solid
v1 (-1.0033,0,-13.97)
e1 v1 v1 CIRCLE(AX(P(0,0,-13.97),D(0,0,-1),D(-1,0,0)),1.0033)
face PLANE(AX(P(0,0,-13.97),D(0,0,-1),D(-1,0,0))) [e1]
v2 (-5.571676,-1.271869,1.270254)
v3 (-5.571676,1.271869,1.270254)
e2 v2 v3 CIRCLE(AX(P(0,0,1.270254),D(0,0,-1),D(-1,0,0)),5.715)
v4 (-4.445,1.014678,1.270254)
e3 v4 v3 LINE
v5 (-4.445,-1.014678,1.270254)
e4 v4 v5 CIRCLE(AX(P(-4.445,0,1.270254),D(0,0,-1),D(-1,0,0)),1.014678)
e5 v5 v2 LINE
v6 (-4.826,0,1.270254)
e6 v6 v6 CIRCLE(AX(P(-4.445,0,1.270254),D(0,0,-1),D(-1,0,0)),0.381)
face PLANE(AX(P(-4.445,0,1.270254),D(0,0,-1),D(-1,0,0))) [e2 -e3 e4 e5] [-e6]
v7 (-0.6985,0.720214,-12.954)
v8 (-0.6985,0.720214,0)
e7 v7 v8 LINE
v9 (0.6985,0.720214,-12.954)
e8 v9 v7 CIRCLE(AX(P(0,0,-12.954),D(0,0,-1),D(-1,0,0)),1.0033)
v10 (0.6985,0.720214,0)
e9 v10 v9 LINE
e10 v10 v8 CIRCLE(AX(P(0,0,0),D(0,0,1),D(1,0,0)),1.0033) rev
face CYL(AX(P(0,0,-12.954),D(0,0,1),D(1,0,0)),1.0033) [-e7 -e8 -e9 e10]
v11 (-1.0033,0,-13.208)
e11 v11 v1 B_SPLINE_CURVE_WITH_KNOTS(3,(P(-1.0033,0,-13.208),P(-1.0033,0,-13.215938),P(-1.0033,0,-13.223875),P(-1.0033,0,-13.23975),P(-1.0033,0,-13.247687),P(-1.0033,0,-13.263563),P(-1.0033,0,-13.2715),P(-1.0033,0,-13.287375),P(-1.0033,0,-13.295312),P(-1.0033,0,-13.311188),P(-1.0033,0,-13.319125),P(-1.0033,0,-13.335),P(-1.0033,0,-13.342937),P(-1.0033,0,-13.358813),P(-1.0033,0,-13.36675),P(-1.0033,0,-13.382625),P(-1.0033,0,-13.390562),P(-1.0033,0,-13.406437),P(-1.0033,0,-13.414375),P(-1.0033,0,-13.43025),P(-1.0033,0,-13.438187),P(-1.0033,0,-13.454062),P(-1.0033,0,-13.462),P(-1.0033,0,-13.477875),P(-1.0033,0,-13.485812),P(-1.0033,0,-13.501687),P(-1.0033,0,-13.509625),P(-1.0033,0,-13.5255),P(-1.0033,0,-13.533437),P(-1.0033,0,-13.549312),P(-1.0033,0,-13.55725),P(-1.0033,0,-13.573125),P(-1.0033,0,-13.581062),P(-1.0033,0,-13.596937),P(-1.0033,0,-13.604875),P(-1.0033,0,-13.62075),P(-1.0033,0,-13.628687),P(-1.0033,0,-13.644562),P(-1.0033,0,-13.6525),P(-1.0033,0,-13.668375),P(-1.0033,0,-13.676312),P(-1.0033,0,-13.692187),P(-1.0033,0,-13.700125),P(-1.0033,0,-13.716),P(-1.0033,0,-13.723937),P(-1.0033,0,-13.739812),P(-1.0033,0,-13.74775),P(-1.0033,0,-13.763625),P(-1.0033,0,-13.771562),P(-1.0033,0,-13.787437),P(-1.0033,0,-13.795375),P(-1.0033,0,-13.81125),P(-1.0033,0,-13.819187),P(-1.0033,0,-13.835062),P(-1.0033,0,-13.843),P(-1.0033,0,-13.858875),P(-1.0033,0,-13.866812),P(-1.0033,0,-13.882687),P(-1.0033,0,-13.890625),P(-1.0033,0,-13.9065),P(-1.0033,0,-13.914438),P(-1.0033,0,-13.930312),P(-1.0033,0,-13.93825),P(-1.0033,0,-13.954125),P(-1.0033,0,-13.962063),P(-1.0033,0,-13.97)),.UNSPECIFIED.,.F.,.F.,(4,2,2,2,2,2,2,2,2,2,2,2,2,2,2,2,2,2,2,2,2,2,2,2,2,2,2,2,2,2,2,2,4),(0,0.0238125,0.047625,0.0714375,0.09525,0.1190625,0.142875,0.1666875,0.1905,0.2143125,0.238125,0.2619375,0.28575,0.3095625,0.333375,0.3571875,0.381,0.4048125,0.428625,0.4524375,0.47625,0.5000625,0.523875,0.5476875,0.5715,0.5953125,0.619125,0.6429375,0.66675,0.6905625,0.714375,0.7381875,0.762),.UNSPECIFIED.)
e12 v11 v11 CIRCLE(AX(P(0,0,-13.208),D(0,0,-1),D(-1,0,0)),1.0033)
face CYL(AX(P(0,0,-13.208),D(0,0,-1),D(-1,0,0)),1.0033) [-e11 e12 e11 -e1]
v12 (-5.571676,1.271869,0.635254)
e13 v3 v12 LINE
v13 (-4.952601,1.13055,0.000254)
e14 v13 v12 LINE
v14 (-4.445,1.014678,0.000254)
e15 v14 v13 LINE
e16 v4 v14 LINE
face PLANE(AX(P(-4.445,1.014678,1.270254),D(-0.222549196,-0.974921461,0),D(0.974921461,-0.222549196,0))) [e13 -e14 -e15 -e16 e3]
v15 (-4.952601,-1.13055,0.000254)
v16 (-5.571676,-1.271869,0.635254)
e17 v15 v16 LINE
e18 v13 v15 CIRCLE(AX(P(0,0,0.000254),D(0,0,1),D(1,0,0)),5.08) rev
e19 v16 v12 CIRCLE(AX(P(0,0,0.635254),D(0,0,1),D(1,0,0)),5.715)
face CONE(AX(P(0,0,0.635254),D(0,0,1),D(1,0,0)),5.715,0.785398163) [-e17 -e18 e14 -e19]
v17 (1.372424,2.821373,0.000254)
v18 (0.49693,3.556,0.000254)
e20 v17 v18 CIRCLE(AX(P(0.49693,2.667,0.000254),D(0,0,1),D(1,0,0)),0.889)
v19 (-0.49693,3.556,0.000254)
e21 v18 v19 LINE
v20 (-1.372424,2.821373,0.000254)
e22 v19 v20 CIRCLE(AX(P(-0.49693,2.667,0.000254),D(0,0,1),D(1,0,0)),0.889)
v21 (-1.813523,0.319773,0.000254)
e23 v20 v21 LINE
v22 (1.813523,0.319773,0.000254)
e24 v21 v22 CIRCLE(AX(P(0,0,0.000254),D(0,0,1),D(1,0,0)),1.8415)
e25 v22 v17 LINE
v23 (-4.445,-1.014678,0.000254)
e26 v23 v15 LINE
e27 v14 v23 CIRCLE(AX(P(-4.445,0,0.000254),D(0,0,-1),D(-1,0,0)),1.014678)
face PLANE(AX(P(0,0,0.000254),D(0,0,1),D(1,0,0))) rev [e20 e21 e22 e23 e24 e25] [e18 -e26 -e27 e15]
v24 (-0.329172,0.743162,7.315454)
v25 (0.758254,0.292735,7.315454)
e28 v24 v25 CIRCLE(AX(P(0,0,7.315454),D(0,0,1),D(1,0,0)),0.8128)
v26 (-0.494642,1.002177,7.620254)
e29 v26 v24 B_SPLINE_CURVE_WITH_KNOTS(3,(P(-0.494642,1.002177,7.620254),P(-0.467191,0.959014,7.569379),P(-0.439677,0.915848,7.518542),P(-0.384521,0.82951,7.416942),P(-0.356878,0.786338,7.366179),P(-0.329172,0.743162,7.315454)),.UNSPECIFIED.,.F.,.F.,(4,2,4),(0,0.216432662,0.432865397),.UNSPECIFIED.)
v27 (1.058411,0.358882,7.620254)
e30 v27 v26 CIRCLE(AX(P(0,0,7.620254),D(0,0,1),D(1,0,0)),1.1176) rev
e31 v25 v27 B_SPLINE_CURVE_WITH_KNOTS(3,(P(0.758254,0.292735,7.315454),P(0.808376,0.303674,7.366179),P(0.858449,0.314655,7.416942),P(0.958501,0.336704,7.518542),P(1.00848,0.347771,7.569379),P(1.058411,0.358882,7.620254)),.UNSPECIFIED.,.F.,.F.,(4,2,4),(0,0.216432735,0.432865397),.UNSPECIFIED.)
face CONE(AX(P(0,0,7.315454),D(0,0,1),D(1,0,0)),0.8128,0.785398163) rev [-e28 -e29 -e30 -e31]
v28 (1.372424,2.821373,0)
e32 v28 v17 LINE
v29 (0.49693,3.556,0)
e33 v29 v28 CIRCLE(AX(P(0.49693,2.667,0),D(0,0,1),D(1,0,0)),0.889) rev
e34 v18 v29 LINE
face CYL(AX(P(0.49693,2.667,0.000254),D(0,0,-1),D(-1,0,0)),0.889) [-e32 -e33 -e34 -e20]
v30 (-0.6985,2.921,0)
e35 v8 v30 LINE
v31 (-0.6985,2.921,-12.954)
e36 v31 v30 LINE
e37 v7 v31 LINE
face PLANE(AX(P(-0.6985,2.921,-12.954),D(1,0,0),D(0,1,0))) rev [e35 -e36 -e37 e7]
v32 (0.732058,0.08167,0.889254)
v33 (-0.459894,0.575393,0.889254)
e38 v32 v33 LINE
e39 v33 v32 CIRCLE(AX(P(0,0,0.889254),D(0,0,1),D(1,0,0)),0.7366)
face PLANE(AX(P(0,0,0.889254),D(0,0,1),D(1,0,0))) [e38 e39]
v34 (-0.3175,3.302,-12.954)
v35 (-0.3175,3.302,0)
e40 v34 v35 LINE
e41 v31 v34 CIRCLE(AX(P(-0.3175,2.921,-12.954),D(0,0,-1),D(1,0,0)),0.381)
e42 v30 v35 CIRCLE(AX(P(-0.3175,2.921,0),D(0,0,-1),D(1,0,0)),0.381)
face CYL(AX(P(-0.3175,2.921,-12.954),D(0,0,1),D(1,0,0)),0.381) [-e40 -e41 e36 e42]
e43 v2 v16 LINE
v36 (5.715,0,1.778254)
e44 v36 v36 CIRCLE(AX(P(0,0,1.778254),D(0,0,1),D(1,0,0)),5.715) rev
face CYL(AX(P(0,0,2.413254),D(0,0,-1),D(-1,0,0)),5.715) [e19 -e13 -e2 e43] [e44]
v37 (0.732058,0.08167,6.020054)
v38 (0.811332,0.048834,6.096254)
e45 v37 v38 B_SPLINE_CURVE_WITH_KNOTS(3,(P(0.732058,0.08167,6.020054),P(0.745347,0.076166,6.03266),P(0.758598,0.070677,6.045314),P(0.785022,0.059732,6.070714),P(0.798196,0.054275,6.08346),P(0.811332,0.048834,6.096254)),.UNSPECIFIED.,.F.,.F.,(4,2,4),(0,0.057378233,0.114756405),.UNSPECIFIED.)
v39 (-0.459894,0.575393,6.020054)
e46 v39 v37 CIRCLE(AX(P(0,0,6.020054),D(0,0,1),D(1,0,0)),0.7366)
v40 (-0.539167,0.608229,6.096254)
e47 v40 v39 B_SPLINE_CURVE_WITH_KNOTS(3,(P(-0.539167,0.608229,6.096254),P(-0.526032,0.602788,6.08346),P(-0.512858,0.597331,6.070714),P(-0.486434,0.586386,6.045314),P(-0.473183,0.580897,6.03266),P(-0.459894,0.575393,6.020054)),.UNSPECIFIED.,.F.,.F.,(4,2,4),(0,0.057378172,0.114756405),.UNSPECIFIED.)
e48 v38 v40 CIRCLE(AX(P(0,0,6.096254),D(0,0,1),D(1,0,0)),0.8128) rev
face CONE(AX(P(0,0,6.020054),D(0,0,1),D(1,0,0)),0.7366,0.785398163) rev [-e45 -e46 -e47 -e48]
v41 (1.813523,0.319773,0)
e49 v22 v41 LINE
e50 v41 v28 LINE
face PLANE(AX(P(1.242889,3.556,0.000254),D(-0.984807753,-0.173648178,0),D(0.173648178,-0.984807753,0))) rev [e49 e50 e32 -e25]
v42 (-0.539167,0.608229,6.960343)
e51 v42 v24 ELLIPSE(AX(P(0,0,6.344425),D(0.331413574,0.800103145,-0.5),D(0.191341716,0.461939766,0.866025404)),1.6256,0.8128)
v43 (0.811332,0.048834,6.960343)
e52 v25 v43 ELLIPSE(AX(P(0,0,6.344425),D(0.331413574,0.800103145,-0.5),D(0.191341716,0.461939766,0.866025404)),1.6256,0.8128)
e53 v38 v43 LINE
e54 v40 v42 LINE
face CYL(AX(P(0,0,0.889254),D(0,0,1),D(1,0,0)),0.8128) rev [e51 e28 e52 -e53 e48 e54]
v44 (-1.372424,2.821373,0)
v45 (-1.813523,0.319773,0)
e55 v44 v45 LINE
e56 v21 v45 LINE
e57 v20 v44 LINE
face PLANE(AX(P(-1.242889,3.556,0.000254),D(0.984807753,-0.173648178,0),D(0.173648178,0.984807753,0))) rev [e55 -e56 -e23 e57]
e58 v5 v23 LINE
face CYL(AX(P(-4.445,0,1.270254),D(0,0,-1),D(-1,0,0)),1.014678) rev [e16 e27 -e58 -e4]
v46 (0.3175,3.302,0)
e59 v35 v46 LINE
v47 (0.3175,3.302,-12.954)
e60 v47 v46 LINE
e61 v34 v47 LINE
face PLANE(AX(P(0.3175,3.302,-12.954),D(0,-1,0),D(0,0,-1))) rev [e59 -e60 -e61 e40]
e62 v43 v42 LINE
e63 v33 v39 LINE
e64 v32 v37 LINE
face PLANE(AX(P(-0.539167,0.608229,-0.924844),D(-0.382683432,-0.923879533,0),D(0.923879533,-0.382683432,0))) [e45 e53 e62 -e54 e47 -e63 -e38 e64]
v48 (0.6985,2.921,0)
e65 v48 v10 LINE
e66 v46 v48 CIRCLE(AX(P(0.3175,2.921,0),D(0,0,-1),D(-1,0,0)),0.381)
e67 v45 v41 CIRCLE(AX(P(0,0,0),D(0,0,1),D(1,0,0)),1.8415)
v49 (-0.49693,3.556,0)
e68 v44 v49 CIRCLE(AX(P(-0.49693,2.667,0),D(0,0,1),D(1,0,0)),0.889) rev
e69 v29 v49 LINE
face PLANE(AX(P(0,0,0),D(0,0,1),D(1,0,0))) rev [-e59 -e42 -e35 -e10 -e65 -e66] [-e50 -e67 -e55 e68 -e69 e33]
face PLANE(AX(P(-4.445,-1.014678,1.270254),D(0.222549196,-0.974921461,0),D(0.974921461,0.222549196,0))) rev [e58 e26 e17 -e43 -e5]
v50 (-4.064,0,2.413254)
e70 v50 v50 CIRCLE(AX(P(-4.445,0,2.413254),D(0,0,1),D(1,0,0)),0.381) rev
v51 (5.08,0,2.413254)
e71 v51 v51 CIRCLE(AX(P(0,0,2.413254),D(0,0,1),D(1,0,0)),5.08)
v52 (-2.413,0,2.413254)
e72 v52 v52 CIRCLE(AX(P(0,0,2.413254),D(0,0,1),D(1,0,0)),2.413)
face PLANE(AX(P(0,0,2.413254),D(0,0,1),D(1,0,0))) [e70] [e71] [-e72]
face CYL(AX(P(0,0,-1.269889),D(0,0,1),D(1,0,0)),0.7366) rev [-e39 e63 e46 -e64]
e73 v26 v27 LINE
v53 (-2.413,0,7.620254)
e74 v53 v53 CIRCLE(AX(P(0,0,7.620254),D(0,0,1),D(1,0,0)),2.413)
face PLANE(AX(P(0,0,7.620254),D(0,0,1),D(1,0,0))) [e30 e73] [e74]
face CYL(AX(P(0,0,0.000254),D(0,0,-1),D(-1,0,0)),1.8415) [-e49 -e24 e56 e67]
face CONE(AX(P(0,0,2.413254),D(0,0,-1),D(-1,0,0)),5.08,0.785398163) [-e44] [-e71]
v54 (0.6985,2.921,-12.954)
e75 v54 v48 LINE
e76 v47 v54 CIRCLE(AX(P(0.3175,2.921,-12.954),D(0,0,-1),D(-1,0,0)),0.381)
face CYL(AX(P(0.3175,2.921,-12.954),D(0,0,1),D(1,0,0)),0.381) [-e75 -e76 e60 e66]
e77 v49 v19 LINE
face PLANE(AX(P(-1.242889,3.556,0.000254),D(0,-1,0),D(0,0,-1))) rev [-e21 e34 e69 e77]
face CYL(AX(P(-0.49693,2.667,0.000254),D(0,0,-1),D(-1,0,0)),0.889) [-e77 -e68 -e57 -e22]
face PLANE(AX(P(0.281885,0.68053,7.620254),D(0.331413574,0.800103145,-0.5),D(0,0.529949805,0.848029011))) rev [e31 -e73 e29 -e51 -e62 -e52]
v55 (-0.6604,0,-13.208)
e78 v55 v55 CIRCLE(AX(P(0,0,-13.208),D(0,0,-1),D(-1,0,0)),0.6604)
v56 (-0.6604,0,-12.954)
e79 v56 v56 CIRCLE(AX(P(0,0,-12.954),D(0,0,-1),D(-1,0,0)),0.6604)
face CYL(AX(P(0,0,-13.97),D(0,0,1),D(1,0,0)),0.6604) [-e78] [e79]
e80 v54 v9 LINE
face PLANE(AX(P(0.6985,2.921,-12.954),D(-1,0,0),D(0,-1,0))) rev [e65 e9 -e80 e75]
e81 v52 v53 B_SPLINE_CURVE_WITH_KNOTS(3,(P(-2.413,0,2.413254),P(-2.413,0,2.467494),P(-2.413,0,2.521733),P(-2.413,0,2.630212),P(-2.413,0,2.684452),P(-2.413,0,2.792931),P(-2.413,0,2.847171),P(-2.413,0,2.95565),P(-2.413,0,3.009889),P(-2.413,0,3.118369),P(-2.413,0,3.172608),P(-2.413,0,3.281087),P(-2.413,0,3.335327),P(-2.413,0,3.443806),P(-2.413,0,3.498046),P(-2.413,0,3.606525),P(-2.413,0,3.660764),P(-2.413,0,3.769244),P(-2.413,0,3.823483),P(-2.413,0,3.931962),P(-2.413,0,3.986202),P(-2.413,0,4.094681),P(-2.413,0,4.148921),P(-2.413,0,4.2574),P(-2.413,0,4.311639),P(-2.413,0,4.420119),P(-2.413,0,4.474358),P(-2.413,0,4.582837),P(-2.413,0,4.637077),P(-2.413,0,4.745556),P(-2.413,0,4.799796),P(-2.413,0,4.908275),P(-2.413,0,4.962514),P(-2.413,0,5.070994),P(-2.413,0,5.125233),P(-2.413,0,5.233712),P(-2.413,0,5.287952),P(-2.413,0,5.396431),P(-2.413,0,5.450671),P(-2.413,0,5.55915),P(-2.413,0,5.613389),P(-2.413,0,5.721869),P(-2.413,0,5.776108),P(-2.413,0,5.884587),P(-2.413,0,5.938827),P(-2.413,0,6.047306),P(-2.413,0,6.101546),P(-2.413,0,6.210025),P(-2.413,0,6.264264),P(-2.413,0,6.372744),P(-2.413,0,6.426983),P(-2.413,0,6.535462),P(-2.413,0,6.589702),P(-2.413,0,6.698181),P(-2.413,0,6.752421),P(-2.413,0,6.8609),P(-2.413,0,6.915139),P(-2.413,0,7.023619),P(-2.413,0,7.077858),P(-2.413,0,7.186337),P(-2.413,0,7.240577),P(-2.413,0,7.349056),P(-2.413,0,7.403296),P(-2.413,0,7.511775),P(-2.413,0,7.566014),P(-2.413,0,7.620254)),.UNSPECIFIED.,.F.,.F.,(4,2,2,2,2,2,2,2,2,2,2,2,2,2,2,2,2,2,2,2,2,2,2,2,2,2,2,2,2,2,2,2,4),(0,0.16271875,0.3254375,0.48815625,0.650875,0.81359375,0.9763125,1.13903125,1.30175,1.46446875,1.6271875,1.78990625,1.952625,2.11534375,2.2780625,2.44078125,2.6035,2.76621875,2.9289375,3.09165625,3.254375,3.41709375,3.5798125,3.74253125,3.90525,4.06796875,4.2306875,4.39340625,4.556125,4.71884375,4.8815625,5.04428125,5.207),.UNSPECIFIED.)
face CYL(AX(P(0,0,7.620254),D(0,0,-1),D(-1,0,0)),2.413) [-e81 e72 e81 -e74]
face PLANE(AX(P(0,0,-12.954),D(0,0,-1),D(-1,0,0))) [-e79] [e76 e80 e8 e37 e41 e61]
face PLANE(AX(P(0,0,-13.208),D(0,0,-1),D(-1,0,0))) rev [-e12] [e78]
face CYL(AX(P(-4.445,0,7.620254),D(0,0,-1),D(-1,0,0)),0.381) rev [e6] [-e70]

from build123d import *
from build123d.topology import SkipClean

# Parameters (mm, degrees)
EXTRUDE1_DEPTH               = 0.000254
SKETCH8_R                    = 2.413
EXTRUDE8_DEPTH               = 7.62
SKETCH6_R                    = 5.715
EXTRUDE6_DEPTH               = 2.413
SKETCH4_R                    = 0.254
EXTRUDE4_DEPTH               = 6.731
SKETCH5_R                    = 1.0033
EXTRUDE5_DEPTH               = 12.954
FILLET2_R                    = 0.889
CHAMFER1_SIZE                = 0.635
CHAMFER3_SIZE                = 0.635
EXTRUDE9_DEPTH               = 12.954
EXTRUDE11_DEPTH              = 6.731
CIRPATTERN1_COUNT            = 8
EXTRUDE12_DEPTH              = 6.731
CHAMFER4_SIZE                = 0.381
CHAMFER4_SIZE2               = 0.659911358
EXTRUDE13_DEPTH              = 0.6604
CUT_REVOLVE1_ANGLE           = 130
CUT_REVOLVE1_OTHER_WAY_ANGLE = 90
BOSS_EXTRUDE1_DEPTH          = 6.071088642
CUT_EXTRUDE1_DEPTH           = 0.838688642
CHAMFER5_SIZE                = 0.1016
CHAMFER6_SIZE                = 0.3048
SKETCH27_R                   = 0.381
CUT_EXTRUDE5_DEPTH           = 16.268548261
CUT_EXTRUDE7_DEPTH           = 1.27
SKETCH29_R                   = 0.6604
BOSS_EXTRUDE2_DEPTH          = 1.016
BOSS_EXTRUDE3_START          = -0.762
SKETCH30_R                   = 1.0033
BOSS_EXTRUDE3_DEPTH          = 0.762


with BuildPart() as part:
    # Sketch1 → Extrude1 (new body)
    with BuildSketch(Plane.XY):
        with BuildLine():
            Line((-1.242889362, 3.556), (-1.813523477, 0.319773119))
            ThreePointArc((-1.813523477, 0.319773119), (0, -1.8415), (1.813523477, 0.319773119))
            Line((1.813523477, 0.319773119), (1.242889362, 3.556))
            Line((1.242889362, 3.556), (-1.242889362, 3.556))
        make_face()
    extrude(amount=EXTRUDE1_DEPTH)

    # Sketch8 → Extrude8 (add)
    with BuildSketch(Plane.XY.offset(0.000254)):
        with Locations(Location((0, 0, 0), (0, 0, 129.743387424))):
            Circle(SKETCH8_R)
    extrude(amount=EXTRUDE8_DEPTH)

    # Sketch6 → Extrude6 (add)
    with BuildSketch(Plane.XY.offset(0.000254)):
        Circle(SKETCH6_R)
    extrude(amount=EXTRUDE6_DEPTH)

    # Sketch4 → Extrude4 (cut)
    with BuildSketch(Plane.XY.offset(7.620254)):
        Circle(SKETCH4_R)
    extrude(amount=-EXTRUDE4_DEPTH, mode=Mode.SUBTRACT)

    # Sketch5 → Extrude5 (add)
    with BuildSketch(Plane(origin=(0, 0, 0), x_dir=(-1, 0, 0), z_dir=(0, 0, -1))):
        with Locations(Location((0, 0, 0), (0, 0, 180))):
            Circle(SKETCH5_R)
    extrude(amount=EXTRUDE5_DEPTH)

    # Fillet2
    fillet2_edges = [part.edges().sort_by_distance(p)[0] for p in [
        (1.242889362, 3.556, 0.000127),
        (-1.242889362, 3.556, 0.000127),
    ]]
    fillet(fillet2_edges, radius=FILLET2_R)

    # Chamfer1
    chamfer1_edges = [part.edges().sort_by_distance(p)[0] for p in [
        (-5.715, 0, 0.000254),
    ]]
    chamfer(chamfer1_edges, length=CHAMFER1_SIZE)

    # Chamfer3
    chamfer3_edges = [part.edges().sort_by_distance(p)[0] for p in [
        (-5.715, 0, 2.413254),
    ]]
    chamfer(chamfer3_edges, length=CHAMFER3_SIZE)

    # Sketch9 → Extrude9 (add)
    with BuildSketch(Plane(origin=(0, 0, 0), x_dir=(-1, 0, 0), z_dir=(0, 0, -1))):
        with BuildLine():
            Line((-0.3175, 3.302), (0.3175, 3.302))
            ThreePointArc((0.3175, 3.302), (0.586907684, 3.190407684), (0.6985, 2.921))
            Line((0.6985, 2.921), (0.6985, 0))
            Line((0.6985, 0), (-0.6985, 0))
            Line((-0.6985, 0), (-0.6985, 2.921))
            ThreePointArc((-0.6985, 2.921), (-0.586907684, 3.190407684), (-0.3175, 3.302))
        make_face()
    extrude(amount=EXTRUDE9_DEPTH)

    # Sketch17 → Extrude11 (cut)
    with BuildSketch(Plane.XY.offset(7.620254)):
        with BuildLine():
            Line((0, 0), (0, 0.8128))
            ThreePointArc((0, 0.8128), (0.077181384, 0.80912723), (0.153665255, 0.798142111))
            ThreePointArc((0.153665255, 0.798142111), (0.281884616, 0.680529664), (0.455713955, 0.673029443))
            ThreePointArc((0.455713955, 0.673029443), (0.517563871, 0.626714831), (0.574736392, 0.574736392))
            Line((0.574736392, 0.574736392), (0, 0))
        make_face()
    extrude11 = extrude(amount=-EXTRUDE11_DEPTH, mode=Mode.SUBTRACT)

    # CirPattern1: Extrude11 ×8 about axis
    cirpattern1_axis = Axis((0, 0, 0), (0, 0, 1))
    for i in range(1, CIRPATTERN1_COUNT):
        add(extrude11.rotate(cirpattern1_axis, i * 360 / CIRPATTERN1_COUNT), mode=Mode.SUBTRACT)

    # Sketch18 → Extrude12 (add)
    with BuildSketch(Plane.XY.offset(7.620254)):
        Polygon((-0.539167209, 0.608229037), (0.811331666, 0.048834087), (0.986294531, 0.471231809), (-0.364204343, 1.030626759), align=None)
    extrude(amount=-EXTRUDE12_DEPTH)

    # Chamfer4
    chamfer4_edges = [part.edges().sort_by_distance(p)[0] for p in [
        (0.136082229, 0.328531562, 7.620254),
    ]]
    chamfer4_side = [part.faces().sort_by_distance(p)[0] for p in [
        (1.499116567, -1.802914954, 7.620254),
    ]]
    chamfer(chamfer4_edges, length=CHAMFER4_SIZE, length2=CHAMFER4_SIZE2, reference=chamfer4_side[0])

    # Sketch19 → Extrude13 (cut)
    with SkipClean():  # the faces are left unmerged after this step: merging them gives an invalid solid
        with BuildSketch(Plane.XY.offset(7.620254)):
            with BuildLine():
                Line((0.811331666, 0.048834087), (-0.539167209, 0.608229037))
                ThreePointArc((-0.539167209, 0.608229037), (-0.311045094, -0.750929284), (0.811331666, 0.048834087))
            make_face()
        extrude(amount=-EXTRUDE13_DEPTH, mode=Mode.SUBTRACT)

    # Sketch20 → Cut-Revolve1 (revolve, cut)
    with SkipClean():  # the faces are left unmerged after this step: merging them gives an invalid solid
        with BuildSketch(Plane(origin=(0, 0, 0), x_dir=(0, 0, -1), z_dir=(1, 0, 0))):
            Polygon((-6.959854, -0.8128), (-6.959854, 0), (-6.147054, 0), align=None)
        revolve(axis=Axis((0, 0, 7.389643883), (0, 0, -1)), revolution_arc=CUT_REVOLVE1_ANGLE, mode=Mode.SUBTRACT)

    # Sketch20 → Cut-Revolve1 other way (revolve, cut)
    with SkipClean():  # the faces are left unmerged after this step: merging them gives an invalid solid
        with BuildSketch(Plane(origin=(0, 0, 0), x_dir=(0, 0, -1), z_dir=(1, 0, 0))):
            Polygon((-6.959854, -0.8128), (-6.959854, 0), (-6.147054, 0), align=None)
        revolve(axis=Axis((0, 0, 7.389643883), (0, 0, 1)), revolution_arc=CUT_REVOLVE1_OTHER_WAY_ANGLE, mode=Mode.SUBTRACT)

    # Sketch21 → Boss-Extrude1 (add)
    with SkipClean():  # the faces are left unmerged after this step: merging them gives an invalid solid
        with BuildSketch(Plane.XY.offset(6.960342642)):
            with BuildLine():
                Line((-0.459893976, 0.575392988), (-0.539167209, 0.608229037))
                ThreePointArc((-0.539167209, 0.608229037), (-0.311045094, -0.750929284), (0.811331666, 0.048834087))
                Line((0.811331666, 0.048834087), (0.732058433, 0.081670135))
                ThreePointArc((0.732058433, 0.081670135), (-0.281884616, -0.680529664), (-0.459893976, 0.575392988))
            make_face()
        extrude(amount=-BOSS_EXTRUDE1_DEPTH)

    # Sketch22 → Cut-Extrude1 (cut)
    with SkipClean():  # the faces are left unmerged after this step: merging them gives an invalid solid
        with BuildSketch(Plane.XY.offset(6.960342642)):
            with BuildLine():
                Line((-0.459893976, 0.575392988), (-0.539167209, 0.608229037))
                ThreePointArc((-0.539167209, 0.608229037), (-0.311045094, -0.750929284), (0.811331666, 0.048834087))
                Line((0.811331666, 0.048834087), (0.732058433, 0.081670135))
                ThreePointArc((0.732058433, 0.081670135), (-0.281884616, -0.680529664), (-0.459893976, 0.575392988))
            make_face()
        extrude(amount=-CUT_EXTRUDE1_DEPTH, mode=Mode.SUBTRACT)

    # Chamfer5
    # the kernel refuses this chamfer: 0.1016 mm, written as the material it takes off along each edge
    with BuildSketch(Plane(origin=(0, 0, 6.121654), x_dir=(-0.3826834323650876, -0.9238795325112875, 0), z_dir=(0.9238795325112875, -0.3826834323650876, 0))) as chamfer5_piece_1_section:
        Polygon((0.7366 + CHAMFER5_SIZE, 0), (0.7366, CHAMFER5_SIZE), (0.7366, 0), align=None)
    chamfer5_piece_1 = revolve(axis=Axis((0, 0, 6.121654), (0, 0, -1)), revolution_arc=45, mode=Mode.PRIVATE)
    chamfer5_piece_1 = chamfer5_piece_1 & Plane(origin=(0, 0, 6.086219336), x_dir=(-0.6633454831704748, 0.74831328329606, 0), z_dir=(0, 0, 1)) * Cylinder(0.8128, 4, mode=Mode.PRIVATE)
    add(chamfer5_piece_1, mode=Mode.SUBTRACT)
    with BuildSketch(Plane(origin=(0, 0, 6.121654), x_dir=(0.3826834323650712, -0.9238795325112945, 0), z_dir=(0.9238795325112945, 0.3826834323650712, 0))) as chamfer5_piece_2_section:
        Polygon((0.7366 + CHAMFER5_SIZE, 0), (0.7366, CHAMFER5_SIZE), (0.7366, 0), align=None)
    chamfer5_piece_2 = revolve(axis=Axis((0, 0, 6.121654), (0, 0, -1)), revolution_arc=45, mode=Mode.PRIVATE)
    chamfer5_piece_2 = chamfer5_piece_2 & Plane(origin=(0, 0, 6.086219336), x_dir=(-0.6633454831704748, 0.74831328329606, 0), z_dir=(0, 0, 1)) * Cylinder(0.8128, 4, mode=Mode.PRIVATE)
    add(chamfer5_piece_2, mode=Mode.SUBTRACT)
    with BuildSketch(Plane(origin=(0, 0, 6.121654), x_dir=(-0.9238795325112938, -0.3826834323650728, 0), z_dir=(0.3826834323650728, -0.9238795325112938, 0))) as chamfer5_piece_3_section:
        Polygon((0.7366 + CHAMFER5_SIZE, 0), (0.7366, CHAMFER5_SIZE), (0.7366, 0), align=None)
    chamfer5_piece_3 = revolve(axis=Axis((0, 0, 6.121654), (0, 0, -1)), revolution_arc=45, mode=Mode.PRIVATE)
    chamfer5_piece_3 = chamfer5_piece_3 & Plane(origin=(0, 0, 6.086219336), x_dir=(-0.6633454831704748, 0.74831328329606, 0), z_dir=(0, 0, 1)) * Cylinder(0.8128, 4, mode=Mode.PRIVATE)
    add(chamfer5_piece_3, mode=Mode.SUBTRACT)
    with BuildSketch(Plane(origin=(0, 0, 6.121654), x_dir=(-0.9238795325112764, 0.3826834323651145, 0), z_dir=(-0.3826834323651145, -0.9238795325112764, 0))) as chamfer5_piece_4_section:
        Polygon((0.7366 + CHAMFER5_SIZE, 0), (0.7366, CHAMFER5_SIZE), (0.7366, 0), align=None)
    chamfer5_piece_4 = revolve(axis=Axis((0, 0, 6.121654), (0, 0, -1)), revolution_arc=49.190233443, mode=Mode.PRIVATE)
    chamfer5_piece_4 = chamfer5_piece_4 & Plane(origin=(0, 0, 6.085867455), x_dir=(-0.6633454831704748, 0.74831328329606, 0), z_dir=(0, 0, 1)) * Cylinder(0.8128, 4, mode=Mode.PRIVATE)
    chamfer5_piece_4 = split(chamfer5_piece_4, bisect_by=Plane(origin=(-0.544175649, 0.610303601, 6.085867455), z_dir=(-0.38268343236508656, -0.9238795325112882, 0)), keep=Keep.TOP, mode=Mode.PRIVATE)
    add(chamfer5_piece_4, mode=Mode.SUBTRACT)
    with BuildSketch(Plane(origin=(0, 0, 6.121654), x_dir=(0.9238795325112772, -0.3826834323651127, 0), z_dir=(0.3826834323651127, 0.9238795325112772, 0))) as chamfer5_piece_5_section:
        Polygon((0.7366 + CHAMFER5_SIZE, 0), (0.7366, CHAMFER5_SIZE), (0.7366, 0), align=None)
    chamfer5_piece_5 = revolve(axis=Axis((0, 0, 6.121654), (0, 0, -1)), revolution_arc=45, mode=Mode.PRIVATE)
    chamfer5_piece_5 = chamfer5_piece_5 & Plane(origin=(0, 0, 6.086219336), x_dir=(-0.6633454831704748, 0.74831328329606, 0), z_dir=(0, 0, 1)) * Cylinder(0.8128, 4, mode=Mode.PRIVATE)
    add(chamfer5_piece_5, mode=Mode.SUBTRACT)
    with BuildSketch(Plane(origin=(0, 0, 6.121654), x_dir=(0.8934479656215565, 0.44916670928142266, 0), z_dir=(-0.44916670928142266, 0.8934479656215565, 0))) as chamfer5_piece_6_section:
        Polygon((0.7366 + CHAMFER5_SIZE, 0), (0.7366, CHAMFER5_SIZE), (0.7366, 0), align=None)
    chamfer5_piece_6 = revolve(axis=Axis((0, 0, 6.121654), (0, 0, -1)), revolution_arc=49.190233443, mode=Mode.PRIVATE)
    chamfer5_piece_6 = chamfer5_piece_6 & Plane(origin=(0, 0, 6.085867455), x_dir=(-0.6633454831704748, 0.74831328329606, 0), z_dir=(0, 0, 1)) * Cylinder(0.8128, 4, mode=Mode.PRIVATE)
    chamfer5_piece_6 = split(chamfer5_piece_6, bisect_by=Plane(origin=(0.816340106, 0.046759523, 6.085867455), z_dir=(-0.38268343236508556, -0.9238795325112885, 0)), keep=Keep.TOP, mode=Mode.PRIVATE)
    add(chamfer5_piece_6, mode=Mode.SUBTRACT)

    # Chamfer6
    chamfer6_edges = [part.edges().sort_by_distance(p)[0] for p in [
        (-0.311045094, -0.750929284, 7.620254),
    ]]
    chamfer(chamfer6_edges, length=CHAMFER6_SIZE)

    # Sketch27 → Cut-Extrude5 (cut, through all)
    with BuildSketch(Plane.XY):
        with Locations((-4.445, 0)):
            Circle(SKETCH27_R)
    extrude(amount=CUT_EXTRUDE5_DEPTH, mode=Mode.SUBTRACT)

    # Sketch28 → Cut-Extrude7 (cut)
    with BuildSketch(Plane(origin=(0, 0, 0.000254), x_dir=(-1, 0, 0), z_dir=(0, 0, -1))):
        with BuildLine():
            Line((4.445, 1.014677811), (6.190751279, 1.413187392))
            ThreePointArc((6.190751279, 1.413187392), (6.35, 0), (6.190751279, -1.413187392))
            Line((6.190751279, -1.413187392), (4.445, -1.014677811))
            ThreePointArc((4.445, -1.014677811), (3.430322189, 0), (4.445, 1.014677811))
        make_face()
    extrude(amount=-CUT_EXTRUDE7_DEPTH, mode=Mode.SUBTRACT)

    # Sketch29 → Boss-Extrude2 (add)
    with BuildSketch(Plane(origin=(0, 0, -12.954), x_dir=(-1, 0, 0), z_dir=(0, 0, -1))):
        Circle(SKETCH29_R)
    extrude(amount=BOSS_EXTRUDE2_DEPTH)

    # Sketch30 → Boss-Extrude3 (add)
    with BuildSketch(Plane(origin=(0, 0, -13.97), x_dir=(-1, 0, 0), z_dir=(0, 0, -1)).offset(BOSS_EXTRUDE3_START)):
        Circle(SKETCH30_R)
    extrude(amount=BOSS_EXTRUDE3_DEPTH)


solid = part.part
